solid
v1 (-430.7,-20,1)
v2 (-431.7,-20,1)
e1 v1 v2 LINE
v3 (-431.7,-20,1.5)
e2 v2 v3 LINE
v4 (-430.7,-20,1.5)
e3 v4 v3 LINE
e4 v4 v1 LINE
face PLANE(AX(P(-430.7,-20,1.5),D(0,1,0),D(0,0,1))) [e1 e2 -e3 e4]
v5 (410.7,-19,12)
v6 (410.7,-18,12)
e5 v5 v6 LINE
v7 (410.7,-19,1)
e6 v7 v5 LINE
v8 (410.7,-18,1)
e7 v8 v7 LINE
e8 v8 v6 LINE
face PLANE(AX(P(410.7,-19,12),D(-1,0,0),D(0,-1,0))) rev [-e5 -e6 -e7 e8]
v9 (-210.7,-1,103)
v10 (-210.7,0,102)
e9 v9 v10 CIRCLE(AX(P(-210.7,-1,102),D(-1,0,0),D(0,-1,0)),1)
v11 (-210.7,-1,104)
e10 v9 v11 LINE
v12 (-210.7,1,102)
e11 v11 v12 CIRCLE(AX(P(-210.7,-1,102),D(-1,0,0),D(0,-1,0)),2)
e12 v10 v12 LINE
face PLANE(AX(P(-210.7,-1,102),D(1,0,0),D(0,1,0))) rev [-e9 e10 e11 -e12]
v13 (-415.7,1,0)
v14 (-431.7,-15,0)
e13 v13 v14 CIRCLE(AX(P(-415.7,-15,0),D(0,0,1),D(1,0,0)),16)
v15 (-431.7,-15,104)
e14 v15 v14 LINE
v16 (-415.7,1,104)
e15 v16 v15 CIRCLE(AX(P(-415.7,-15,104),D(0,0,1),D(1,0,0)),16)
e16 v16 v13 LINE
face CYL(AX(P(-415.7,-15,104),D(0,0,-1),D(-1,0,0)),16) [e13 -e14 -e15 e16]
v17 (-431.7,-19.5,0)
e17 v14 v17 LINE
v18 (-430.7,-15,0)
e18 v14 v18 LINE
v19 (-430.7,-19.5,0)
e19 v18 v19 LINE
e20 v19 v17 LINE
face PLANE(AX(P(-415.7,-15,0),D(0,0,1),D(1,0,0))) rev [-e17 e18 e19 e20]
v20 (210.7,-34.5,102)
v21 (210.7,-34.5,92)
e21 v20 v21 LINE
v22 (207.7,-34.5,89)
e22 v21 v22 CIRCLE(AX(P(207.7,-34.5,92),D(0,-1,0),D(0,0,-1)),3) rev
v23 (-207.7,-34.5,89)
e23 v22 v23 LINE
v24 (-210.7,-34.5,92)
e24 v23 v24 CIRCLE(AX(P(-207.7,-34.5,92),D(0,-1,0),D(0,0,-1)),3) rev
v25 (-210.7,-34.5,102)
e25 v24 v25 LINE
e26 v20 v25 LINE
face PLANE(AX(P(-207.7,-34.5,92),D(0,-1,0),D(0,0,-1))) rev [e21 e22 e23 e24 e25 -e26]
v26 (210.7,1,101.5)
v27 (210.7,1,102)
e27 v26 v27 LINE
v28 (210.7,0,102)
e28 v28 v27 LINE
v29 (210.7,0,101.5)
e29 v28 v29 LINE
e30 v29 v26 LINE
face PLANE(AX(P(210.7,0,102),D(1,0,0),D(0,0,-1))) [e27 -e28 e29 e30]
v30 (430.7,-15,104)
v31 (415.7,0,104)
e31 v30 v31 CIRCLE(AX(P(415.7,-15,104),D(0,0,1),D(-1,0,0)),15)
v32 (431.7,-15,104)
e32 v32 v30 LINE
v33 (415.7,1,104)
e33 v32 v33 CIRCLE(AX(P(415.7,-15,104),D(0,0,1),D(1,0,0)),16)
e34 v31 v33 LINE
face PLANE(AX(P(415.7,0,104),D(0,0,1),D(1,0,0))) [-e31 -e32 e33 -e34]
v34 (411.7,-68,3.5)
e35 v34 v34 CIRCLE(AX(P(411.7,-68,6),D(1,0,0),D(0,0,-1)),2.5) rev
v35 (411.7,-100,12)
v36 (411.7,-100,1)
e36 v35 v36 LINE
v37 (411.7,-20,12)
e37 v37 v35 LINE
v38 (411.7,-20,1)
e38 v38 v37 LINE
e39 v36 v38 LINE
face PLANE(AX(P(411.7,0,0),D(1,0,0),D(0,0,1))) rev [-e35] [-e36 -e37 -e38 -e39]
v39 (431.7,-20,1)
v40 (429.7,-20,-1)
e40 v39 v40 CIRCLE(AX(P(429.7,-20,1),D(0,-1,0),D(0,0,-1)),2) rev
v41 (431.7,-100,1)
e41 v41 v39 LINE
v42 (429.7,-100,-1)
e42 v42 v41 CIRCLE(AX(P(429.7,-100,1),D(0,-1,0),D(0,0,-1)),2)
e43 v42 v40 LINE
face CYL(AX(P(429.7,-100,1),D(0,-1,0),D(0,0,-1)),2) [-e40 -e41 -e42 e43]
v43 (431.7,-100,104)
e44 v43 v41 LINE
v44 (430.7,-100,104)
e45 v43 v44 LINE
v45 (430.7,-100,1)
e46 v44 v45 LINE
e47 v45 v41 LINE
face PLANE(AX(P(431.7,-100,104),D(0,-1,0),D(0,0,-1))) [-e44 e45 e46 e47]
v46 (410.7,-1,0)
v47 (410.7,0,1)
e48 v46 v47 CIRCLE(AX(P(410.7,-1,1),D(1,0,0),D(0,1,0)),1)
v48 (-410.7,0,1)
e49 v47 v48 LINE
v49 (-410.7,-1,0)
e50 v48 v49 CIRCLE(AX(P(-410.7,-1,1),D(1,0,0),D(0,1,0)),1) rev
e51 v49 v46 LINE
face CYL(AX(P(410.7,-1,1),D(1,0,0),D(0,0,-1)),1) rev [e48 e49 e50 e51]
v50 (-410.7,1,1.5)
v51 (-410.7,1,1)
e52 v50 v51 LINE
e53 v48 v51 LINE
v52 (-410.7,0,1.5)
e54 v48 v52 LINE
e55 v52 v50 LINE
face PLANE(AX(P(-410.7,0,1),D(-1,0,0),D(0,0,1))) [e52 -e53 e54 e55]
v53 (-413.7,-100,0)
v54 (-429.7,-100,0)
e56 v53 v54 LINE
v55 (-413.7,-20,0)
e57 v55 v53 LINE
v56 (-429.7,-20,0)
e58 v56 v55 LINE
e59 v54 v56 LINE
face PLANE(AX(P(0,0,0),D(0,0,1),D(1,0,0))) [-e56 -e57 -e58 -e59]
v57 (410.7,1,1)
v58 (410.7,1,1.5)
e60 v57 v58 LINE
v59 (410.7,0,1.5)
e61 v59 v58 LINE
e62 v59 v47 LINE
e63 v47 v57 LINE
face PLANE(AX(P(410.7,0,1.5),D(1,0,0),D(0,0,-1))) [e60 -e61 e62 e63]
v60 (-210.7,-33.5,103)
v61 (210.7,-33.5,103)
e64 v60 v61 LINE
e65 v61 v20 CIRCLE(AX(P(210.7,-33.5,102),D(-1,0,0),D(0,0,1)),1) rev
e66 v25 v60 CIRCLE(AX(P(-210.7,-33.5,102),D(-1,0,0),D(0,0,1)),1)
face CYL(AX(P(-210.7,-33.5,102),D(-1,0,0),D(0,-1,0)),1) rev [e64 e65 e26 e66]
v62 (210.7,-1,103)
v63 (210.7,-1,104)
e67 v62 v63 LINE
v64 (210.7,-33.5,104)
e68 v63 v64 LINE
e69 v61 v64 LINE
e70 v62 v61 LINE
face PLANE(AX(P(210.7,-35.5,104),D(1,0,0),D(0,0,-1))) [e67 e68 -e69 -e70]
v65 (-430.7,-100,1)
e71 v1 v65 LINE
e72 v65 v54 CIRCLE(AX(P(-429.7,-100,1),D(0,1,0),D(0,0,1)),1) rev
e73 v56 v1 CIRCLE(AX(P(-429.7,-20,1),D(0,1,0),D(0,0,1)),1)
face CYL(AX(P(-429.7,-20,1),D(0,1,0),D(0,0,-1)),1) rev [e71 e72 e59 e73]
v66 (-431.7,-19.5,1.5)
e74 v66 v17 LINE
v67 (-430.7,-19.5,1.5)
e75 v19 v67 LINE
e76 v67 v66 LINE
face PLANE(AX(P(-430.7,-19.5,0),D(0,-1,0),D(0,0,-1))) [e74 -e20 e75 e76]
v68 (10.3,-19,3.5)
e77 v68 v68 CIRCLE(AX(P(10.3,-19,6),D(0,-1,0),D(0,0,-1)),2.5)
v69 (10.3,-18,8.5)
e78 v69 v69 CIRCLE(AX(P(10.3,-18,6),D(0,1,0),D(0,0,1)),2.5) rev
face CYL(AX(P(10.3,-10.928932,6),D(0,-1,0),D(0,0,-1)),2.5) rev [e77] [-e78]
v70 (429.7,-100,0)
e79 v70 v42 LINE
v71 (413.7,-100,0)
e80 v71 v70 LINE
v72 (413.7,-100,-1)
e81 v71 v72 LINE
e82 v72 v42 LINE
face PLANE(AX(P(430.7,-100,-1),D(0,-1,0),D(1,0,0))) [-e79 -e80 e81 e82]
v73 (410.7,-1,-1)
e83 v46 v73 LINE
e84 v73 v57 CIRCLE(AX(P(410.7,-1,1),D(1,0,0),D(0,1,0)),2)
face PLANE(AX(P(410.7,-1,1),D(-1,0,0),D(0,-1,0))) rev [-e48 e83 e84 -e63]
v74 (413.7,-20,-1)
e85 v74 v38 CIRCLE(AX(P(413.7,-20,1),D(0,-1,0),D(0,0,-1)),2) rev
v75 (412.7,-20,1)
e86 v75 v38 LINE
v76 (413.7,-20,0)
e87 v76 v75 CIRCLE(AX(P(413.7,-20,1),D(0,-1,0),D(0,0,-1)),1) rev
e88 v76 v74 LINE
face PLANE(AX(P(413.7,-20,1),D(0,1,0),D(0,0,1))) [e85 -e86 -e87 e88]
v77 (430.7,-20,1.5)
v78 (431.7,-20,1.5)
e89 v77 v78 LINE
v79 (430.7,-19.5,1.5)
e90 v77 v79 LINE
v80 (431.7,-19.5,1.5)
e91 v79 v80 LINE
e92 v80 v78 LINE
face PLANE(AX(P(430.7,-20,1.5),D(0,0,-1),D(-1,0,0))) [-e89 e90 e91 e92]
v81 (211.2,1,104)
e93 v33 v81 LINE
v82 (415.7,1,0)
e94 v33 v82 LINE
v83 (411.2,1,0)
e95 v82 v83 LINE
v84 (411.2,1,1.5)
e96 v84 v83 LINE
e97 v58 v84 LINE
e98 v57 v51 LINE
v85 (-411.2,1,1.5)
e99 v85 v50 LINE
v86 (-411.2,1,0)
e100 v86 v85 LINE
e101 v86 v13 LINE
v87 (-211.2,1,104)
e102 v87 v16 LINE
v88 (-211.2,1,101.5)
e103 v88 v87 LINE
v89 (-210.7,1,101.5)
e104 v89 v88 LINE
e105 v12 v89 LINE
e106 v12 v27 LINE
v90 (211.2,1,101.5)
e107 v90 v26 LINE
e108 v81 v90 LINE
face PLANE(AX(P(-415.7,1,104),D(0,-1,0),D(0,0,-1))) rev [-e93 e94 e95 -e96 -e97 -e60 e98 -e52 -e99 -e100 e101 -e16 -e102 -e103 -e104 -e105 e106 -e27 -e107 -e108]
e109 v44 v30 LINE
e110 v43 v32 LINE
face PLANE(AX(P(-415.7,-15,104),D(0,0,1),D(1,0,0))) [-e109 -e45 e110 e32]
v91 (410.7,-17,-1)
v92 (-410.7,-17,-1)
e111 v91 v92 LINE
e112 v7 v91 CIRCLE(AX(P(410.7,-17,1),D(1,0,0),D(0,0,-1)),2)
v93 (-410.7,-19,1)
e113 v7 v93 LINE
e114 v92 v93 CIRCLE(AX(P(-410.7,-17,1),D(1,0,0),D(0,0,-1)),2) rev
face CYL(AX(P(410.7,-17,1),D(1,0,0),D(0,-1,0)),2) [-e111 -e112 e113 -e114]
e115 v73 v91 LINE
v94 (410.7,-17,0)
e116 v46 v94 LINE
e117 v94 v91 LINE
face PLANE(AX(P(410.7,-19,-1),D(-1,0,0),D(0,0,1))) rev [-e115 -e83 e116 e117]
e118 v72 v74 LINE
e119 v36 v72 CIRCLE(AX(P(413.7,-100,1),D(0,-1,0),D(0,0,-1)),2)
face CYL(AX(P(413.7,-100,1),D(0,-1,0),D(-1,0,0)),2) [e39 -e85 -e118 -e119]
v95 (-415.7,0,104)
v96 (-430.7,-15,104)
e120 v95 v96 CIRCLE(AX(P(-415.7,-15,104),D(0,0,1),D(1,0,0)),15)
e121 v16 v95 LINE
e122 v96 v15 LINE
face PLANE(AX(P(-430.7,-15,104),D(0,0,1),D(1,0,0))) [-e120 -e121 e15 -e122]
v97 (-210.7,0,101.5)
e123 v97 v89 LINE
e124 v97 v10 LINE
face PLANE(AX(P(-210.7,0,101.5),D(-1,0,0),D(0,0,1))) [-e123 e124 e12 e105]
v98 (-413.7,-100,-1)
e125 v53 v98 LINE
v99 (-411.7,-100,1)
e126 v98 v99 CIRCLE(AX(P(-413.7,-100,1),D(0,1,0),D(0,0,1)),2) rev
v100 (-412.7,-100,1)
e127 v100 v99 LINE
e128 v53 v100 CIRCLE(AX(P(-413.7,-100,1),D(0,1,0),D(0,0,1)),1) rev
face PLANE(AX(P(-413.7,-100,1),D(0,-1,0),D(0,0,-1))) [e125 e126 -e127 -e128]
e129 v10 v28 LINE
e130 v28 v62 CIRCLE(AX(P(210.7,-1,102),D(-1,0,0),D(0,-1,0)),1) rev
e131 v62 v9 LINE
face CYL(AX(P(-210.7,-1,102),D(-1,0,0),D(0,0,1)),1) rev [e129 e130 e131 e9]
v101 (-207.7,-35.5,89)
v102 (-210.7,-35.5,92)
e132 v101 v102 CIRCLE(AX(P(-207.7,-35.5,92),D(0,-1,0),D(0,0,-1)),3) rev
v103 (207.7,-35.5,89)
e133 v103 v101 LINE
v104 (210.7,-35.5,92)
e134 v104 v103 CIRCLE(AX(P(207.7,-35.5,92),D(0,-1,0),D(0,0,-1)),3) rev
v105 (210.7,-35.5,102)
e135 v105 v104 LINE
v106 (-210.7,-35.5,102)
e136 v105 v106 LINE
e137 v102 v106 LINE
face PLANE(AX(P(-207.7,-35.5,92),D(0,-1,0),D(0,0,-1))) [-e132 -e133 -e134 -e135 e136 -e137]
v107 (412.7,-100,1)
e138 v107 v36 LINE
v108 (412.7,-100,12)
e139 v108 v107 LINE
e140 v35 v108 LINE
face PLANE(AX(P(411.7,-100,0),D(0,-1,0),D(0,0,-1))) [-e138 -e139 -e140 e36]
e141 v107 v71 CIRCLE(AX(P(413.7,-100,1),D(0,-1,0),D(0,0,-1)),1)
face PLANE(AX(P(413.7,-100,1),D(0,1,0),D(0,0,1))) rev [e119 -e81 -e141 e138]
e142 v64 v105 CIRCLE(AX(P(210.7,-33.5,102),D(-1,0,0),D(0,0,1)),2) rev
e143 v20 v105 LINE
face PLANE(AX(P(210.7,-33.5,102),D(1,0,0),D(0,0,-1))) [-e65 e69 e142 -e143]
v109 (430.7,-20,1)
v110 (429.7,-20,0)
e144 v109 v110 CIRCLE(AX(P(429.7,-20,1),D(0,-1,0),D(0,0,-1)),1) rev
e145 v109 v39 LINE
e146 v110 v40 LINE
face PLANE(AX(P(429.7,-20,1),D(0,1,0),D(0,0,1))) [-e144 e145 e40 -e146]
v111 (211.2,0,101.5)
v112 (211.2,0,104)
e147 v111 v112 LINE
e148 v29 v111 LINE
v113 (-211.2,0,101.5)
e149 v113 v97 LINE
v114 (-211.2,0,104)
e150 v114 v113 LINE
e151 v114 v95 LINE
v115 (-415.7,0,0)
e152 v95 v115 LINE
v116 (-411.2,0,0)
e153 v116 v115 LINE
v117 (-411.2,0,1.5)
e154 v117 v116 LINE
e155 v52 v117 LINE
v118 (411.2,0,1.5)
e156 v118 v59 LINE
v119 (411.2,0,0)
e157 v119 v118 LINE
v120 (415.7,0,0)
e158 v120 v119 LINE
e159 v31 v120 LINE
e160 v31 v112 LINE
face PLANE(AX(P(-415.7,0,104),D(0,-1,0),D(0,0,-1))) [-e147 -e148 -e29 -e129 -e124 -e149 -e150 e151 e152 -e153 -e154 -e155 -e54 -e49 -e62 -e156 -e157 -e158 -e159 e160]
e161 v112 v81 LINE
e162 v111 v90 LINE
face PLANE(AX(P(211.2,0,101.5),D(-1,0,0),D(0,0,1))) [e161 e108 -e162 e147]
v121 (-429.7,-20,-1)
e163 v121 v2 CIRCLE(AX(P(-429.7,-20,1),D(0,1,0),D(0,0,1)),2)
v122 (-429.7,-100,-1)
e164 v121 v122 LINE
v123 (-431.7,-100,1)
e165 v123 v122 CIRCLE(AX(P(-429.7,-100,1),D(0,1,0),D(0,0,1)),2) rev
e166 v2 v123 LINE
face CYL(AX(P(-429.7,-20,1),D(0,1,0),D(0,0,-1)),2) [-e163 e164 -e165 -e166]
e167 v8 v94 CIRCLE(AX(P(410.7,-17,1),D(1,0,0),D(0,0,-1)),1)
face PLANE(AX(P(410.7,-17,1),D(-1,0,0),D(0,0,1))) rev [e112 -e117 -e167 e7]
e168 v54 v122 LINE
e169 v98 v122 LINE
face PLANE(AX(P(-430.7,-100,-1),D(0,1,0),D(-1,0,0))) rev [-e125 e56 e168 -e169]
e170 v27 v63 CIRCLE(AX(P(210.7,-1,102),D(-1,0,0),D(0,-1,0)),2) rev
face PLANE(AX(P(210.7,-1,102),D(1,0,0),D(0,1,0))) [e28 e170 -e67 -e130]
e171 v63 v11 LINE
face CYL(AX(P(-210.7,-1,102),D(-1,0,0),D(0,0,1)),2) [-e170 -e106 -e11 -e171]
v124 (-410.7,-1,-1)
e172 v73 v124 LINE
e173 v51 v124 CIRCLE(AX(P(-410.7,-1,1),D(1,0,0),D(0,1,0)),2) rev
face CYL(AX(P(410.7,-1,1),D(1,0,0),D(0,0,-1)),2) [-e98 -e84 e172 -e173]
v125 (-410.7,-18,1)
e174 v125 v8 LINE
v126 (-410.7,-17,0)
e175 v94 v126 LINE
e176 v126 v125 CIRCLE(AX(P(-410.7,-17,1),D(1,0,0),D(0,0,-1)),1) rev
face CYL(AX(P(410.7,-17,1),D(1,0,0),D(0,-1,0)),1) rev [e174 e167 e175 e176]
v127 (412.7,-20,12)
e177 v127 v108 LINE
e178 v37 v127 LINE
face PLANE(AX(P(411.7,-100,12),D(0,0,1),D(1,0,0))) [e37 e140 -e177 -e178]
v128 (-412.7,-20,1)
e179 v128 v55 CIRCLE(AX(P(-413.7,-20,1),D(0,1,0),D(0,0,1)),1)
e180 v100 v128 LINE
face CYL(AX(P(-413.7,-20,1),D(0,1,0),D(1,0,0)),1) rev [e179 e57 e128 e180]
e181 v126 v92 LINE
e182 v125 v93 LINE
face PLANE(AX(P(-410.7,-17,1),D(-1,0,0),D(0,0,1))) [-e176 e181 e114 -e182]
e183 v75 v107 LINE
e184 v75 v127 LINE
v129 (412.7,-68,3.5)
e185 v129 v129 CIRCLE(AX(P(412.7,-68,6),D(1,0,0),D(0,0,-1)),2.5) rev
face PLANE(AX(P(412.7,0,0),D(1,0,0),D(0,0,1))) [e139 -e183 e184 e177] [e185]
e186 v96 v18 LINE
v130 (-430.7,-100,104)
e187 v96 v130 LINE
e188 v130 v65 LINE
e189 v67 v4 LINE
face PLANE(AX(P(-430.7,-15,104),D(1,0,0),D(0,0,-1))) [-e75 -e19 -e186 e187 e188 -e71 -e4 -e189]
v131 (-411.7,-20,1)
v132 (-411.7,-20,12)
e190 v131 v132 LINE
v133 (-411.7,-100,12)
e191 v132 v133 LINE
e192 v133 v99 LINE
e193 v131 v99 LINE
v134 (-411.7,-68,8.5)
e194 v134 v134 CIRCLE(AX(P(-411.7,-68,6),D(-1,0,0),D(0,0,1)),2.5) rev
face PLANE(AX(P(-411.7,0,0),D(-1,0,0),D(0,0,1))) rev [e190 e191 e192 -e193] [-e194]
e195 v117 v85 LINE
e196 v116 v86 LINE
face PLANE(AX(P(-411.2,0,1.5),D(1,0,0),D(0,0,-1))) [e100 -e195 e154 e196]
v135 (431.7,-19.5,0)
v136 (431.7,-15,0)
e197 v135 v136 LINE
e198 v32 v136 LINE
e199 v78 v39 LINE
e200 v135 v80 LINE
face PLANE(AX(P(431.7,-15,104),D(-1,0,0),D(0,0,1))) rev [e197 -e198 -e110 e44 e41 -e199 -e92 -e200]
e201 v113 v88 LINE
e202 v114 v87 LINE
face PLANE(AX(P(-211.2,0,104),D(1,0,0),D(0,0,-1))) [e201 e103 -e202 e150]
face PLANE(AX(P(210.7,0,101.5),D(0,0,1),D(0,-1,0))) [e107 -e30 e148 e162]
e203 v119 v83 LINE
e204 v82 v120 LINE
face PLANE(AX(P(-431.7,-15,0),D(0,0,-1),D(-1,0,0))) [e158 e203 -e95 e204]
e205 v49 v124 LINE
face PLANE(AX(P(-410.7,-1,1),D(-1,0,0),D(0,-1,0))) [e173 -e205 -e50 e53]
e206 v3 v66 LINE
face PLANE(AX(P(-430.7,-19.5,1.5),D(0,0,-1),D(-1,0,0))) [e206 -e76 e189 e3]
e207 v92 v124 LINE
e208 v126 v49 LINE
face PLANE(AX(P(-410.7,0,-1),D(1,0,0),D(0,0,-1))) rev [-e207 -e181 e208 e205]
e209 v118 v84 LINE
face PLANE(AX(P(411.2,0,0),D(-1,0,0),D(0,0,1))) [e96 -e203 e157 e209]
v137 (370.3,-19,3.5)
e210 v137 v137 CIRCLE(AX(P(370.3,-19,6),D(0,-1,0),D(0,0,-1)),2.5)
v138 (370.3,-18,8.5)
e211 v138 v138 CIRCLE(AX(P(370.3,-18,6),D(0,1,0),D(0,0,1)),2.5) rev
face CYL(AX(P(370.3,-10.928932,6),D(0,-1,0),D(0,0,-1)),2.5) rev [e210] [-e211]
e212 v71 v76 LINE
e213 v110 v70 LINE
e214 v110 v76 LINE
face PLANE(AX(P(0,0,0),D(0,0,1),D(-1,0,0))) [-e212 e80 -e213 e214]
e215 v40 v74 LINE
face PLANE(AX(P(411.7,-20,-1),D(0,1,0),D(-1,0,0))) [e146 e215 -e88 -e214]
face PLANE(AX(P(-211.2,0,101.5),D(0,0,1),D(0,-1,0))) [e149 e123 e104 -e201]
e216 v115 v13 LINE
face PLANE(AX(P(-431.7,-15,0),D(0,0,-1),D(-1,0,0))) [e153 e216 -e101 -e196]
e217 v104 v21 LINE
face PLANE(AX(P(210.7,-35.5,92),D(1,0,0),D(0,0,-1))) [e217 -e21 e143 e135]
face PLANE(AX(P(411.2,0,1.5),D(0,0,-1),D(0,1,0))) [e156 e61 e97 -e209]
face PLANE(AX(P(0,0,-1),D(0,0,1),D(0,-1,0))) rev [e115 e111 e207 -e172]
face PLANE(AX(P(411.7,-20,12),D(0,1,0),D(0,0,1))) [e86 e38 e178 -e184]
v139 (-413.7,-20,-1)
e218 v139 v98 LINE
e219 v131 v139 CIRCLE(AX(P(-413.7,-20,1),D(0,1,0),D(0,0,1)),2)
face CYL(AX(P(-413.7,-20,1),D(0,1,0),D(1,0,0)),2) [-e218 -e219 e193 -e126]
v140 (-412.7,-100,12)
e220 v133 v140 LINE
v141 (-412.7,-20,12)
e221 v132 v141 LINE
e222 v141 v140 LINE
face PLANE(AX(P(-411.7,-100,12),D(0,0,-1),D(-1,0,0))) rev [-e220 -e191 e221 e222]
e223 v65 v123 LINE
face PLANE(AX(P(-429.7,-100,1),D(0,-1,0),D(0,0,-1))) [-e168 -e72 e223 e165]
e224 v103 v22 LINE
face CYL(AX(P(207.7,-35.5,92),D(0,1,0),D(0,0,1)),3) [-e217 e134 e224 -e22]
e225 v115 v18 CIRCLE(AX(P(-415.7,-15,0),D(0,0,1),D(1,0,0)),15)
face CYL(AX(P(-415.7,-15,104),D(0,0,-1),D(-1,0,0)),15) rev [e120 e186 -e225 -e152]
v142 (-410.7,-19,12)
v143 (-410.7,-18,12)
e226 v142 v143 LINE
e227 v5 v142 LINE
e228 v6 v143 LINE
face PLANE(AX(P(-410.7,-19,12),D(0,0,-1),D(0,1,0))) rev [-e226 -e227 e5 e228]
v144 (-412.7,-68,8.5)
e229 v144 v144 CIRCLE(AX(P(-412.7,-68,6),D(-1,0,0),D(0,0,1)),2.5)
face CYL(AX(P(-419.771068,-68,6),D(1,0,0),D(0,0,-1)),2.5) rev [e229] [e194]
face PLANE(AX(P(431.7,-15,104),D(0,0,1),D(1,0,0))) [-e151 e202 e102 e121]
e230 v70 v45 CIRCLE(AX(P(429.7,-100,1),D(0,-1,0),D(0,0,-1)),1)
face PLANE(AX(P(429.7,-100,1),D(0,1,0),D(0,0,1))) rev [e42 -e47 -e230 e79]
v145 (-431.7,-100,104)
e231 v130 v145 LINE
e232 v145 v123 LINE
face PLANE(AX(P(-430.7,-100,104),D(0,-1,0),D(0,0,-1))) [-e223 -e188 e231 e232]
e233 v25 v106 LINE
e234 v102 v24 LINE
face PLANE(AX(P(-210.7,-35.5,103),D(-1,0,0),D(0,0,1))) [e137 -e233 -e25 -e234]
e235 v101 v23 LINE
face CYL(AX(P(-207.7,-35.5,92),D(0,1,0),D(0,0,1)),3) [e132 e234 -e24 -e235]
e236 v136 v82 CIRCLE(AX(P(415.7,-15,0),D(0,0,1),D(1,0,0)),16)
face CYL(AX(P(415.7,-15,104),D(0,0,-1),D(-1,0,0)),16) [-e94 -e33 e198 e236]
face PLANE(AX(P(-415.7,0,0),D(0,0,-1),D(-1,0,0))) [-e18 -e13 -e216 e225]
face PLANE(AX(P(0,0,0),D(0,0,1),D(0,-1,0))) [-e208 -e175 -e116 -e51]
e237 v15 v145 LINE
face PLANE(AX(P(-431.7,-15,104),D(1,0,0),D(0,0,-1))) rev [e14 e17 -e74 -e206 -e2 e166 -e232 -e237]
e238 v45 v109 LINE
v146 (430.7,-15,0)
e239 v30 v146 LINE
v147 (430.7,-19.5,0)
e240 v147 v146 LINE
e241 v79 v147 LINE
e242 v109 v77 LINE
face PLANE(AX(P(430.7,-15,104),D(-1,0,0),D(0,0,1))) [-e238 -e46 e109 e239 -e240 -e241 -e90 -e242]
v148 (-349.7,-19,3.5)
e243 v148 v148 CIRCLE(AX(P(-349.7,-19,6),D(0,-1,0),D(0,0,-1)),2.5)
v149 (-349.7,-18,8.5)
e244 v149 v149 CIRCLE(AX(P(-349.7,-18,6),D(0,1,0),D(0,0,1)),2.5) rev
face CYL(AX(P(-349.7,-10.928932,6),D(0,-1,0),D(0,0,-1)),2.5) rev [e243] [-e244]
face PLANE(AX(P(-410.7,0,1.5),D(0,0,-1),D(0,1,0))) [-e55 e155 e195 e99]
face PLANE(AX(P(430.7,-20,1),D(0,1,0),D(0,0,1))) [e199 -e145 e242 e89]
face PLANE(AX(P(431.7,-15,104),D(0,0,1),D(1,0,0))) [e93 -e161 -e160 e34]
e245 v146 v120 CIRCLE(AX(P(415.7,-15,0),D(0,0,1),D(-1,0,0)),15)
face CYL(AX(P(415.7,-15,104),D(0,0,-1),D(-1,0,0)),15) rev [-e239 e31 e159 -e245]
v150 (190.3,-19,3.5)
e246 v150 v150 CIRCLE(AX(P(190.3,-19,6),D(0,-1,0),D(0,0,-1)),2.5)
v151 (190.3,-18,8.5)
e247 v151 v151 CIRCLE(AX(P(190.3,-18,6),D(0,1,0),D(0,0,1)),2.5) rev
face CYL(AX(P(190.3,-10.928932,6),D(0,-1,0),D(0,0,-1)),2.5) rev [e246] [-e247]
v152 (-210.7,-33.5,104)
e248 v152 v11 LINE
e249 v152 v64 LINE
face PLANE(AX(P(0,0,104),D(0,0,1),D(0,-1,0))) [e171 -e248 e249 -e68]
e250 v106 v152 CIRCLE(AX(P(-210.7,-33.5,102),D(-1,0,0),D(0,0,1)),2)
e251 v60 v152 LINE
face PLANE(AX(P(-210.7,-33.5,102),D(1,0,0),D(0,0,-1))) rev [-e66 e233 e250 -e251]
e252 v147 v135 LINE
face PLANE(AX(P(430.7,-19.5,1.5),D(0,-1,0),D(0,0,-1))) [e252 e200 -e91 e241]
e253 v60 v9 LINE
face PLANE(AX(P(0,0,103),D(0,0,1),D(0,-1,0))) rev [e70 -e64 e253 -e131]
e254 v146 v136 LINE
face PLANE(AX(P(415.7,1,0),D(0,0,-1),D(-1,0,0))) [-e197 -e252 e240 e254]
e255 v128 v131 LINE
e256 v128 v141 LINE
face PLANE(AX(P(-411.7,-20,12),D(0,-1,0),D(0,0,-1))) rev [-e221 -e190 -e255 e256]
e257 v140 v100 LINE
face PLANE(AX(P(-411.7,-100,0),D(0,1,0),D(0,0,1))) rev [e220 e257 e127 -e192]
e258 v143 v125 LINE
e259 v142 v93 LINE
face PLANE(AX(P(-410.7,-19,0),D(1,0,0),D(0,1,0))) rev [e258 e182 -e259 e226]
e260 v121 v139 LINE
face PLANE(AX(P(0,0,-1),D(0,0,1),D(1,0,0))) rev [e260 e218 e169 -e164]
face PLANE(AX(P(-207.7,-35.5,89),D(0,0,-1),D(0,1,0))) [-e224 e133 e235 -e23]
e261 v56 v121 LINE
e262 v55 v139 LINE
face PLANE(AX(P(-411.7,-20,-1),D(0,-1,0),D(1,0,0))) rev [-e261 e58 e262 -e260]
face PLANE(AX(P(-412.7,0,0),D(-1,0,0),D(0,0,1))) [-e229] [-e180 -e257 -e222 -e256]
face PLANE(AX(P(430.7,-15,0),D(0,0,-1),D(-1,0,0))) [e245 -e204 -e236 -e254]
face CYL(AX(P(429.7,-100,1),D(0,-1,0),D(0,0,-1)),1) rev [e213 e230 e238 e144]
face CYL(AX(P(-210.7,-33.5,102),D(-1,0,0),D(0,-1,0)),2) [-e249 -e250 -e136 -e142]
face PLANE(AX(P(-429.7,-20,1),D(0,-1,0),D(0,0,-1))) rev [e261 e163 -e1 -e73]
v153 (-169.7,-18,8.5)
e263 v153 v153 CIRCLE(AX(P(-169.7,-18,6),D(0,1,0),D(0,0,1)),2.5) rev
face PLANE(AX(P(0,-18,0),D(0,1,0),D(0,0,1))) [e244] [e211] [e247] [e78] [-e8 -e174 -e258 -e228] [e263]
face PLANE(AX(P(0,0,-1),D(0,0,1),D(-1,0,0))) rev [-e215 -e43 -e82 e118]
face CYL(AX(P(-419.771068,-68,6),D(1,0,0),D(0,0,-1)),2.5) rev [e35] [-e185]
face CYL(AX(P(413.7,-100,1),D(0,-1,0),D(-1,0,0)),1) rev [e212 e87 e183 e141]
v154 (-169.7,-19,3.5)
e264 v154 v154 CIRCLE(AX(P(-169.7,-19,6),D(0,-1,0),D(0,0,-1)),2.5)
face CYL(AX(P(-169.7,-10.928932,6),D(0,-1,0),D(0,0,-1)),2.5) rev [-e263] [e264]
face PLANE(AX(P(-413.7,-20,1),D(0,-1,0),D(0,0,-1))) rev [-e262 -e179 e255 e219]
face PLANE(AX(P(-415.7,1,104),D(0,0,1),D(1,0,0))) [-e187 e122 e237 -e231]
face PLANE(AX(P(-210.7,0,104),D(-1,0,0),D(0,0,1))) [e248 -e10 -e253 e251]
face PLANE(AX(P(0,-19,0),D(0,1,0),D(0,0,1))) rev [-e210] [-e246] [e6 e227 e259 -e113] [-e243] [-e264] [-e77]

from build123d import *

# Parameters (mm, degrees)
BASE_FLANGE1_DEPTH             = 104
EDGE_FLANGE1_STRIP_W           = 6
EDGE_FLANGE1_STRIP_H           = 1
EDGE_FLANGE1_STRIP_CUT_DEPTH   = 821.4
EDGE_FLANGE1_RELIEF_W          = 6.5
EDGE_FLANGE1_RELIEF_H          = 0.5
EDGE_FLANGE1_RELIEF_CUT_DEPTH  = 1
EDGE_FLANGE1_DEPTH             = 821.4
EDGE_FLANGE2_STRIP_W           = 6
EDGE_FLANGE2_STRIP_H           = 1
EDGE_FLANGE2_STRIP_CUT_DEPTH   = 821.4
EDGE_FLANGE2_DEPTH             = 821.4
EDGE_FLANGE3_STRIP_W           = 6
EDGE_FLANGE3_STRIP_H           = 1
EDGE_FLANGE3_STRIP_CUT_DEPTH   = 80
EDGE_FLANGE3_RELIEF_W          = 6.5
EDGE_FLANGE3_RELIEF_H          = 0.5
EDGE_FLANGE3_RELIEF_CUT_DEPTH  = 1
EDGE_FLANGE3_DEPTH             = 80
EDGE_FLANGE4_STRIP_W           = 6
EDGE_FLANGE4_STRIP_H           = 1
EDGE_FLANGE4_STRIP_CUT_DEPTH   = 80
EDGE_FLANGE4_DEPTH             = 80
EDGE_FLANGE5_STRIP_W           = 6
EDGE_FLANGE5_STRIP_H           = 1
EDGE_FLANGE5_STRIP_CUT_DEPTH   = 421.4
EDGE_FLANGE5_RELIEF_W          = 6.5
EDGE_FLANGE5_RELIEF_H          = 0.5
EDGE_FLANGE5_RELIEF_CUT_DEPTH  = 1
EDGE_FLANGE5_DEPTH             = 421.4
SKETCH22_R                     = 2.5
CUT_EXTRUDE1_DEPTH             = 1
SKETCH23_R                     = 2.5
CUT_EXTRUDE2_DEPTH             = 3
CUT_EXTRUDE2_DIRECTION_2_REACH = 857.652
EDGE_FLANGE6_STRIP_W           = 6
EDGE_FLANGE6_STRIP_H           = 1
EDGE_FLANGE6_STRIP_CUT_DEPTH   = 421.4
EDGE_FLANGE6_DEPTH             = 421.4
EDGE_FLANGE6_FLAT_DEPTH        = 1


# Sheet-metal steps are written as plain solids
with BuildPart() as part:
    # Sketch1 → Base-Flange1 (new body)
    with BuildSketch(Plane.XY):
        with BuildLine():
            Line((-430.7, -100), (-430.7, -15))
            ThreePointArc((-430.7, -15), (-426.306601718, -4.393398282), (-415.7, 0))
            Line((-415.7, 0), (415.7, 0))
            ThreePointArc((415.7, 0), (426.306601718, -4.393398282), (430.7, -15))
            Line((430.7, -15), (430.7, -100))
            Line((430.7, -100), (431.7, -100))
            Line((431.7, -100), (431.7, -15))
            ThreePointArc((431.7, -15), (427.013708499, -3.686291501), (415.7, 1))
            Line((415.7, 1), (-415.7, 1))
            ThreePointArc((-415.7, 1), (-427.013708499, -3.686291501), (-431.7, -15))
            Line((-431.7, -15), (-431.7, -100))
            Line((-431.7, -100), (-430.7, -100))
        make_face()
    extrude(amount=BASE_FLANGE1_DEPTH)

    # Edge-Flange1 strip (across the edge) → Edge-Flange1 strip cut (cut)
    with BuildSketch(Plane(origin=(-410.7, 0, 0), x_dir=(0, 0, 1), z_dir=(1, 0, 0))):
        with Locations((-2, -0.5)):
            Rectangle(EDGE_FLANGE1_STRIP_W, EDGE_FLANGE1_STRIP_H)
    extrude(amount=EDGE_FLANGE1_STRIP_CUT_DEPTH, mode=Mode.SUBTRACT)

    # Edge-Flange1 relief (on the sheet) → Edge-Flange1 relief cut (cut)
    with BuildSketch(Plane(origin=(-410.7, 0, 1), x_dir=(0, 0, 1), z_dir=(0, -1, 0))):
        with Locations((-2.75, 0.25)):
            Rectangle(EDGE_FLANGE1_RELIEF_W, EDGE_FLANGE1_RELIEF_H)
        with Locations((-2.75, -821.65)):
            Rectangle(EDGE_FLANGE1_RELIEF_W, EDGE_FLANGE1_RELIEF_H)
    extrude(amount=-EDGE_FLANGE1_RELIEF_CUT_DEPTH, mode=Mode.SUBTRACT)

    # Edge-Flange1 section (across the edge) → Edge-Flange1 (add)
    with BuildSketch(Plane(origin=(-410.7, 0, 0), x_dir=(0, 0, 1), z_dir=(1, 0, 0))):
        with BuildLine():
            Line((-1, 1), (-1, 19))
            Line((-1, 19), (0, 19))
            Line((0, 19), (0, 1))
            ThreePointArc((0, 1), (0.292893219, 0.292893219), (1, 0))
            Line((1, 0), (1, -1))
            ThreePointArc((1, -1), (-0.414213562, -0.414213562), (-1, 1))
        make_face()
    extrude(amount=EDGE_FLANGE1_DEPTH)

    # Edge-Flange2 strip (across the edge) → Edge-Flange2 strip cut (cut)
    with BuildSketch(Plane(origin=(-410.7, -19, 0), x_dir=(0, 1, 0), z_dir=(1, 0, 0))):
        with Locations((-1, -0.5)):
            Rectangle(EDGE_FLANGE2_STRIP_W, EDGE_FLANGE2_STRIP_H)
    extrude(amount=EDGE_FLANGE2_STRIP_CUT_DEPTH, mode=Mode.SUBTRACT)

    # Edge-Flange2 section (across the edge) → Edge-Flange2 (add)
    with BuildSketch(Plane(origin=(-410.7, -19, 0), x_dir=(0, 1, 0), z_dir=(1, 0, 0))):
        with BuildLine():
            Line((0, 1), (0, 12))
            Line((0, 12), (1, 12))
            Line((1, 12), (1, 1))
            ThreePointArc((1, 1), (1.292893219, 0.292893219), (2, 0))
            Line((2, 0), (2, -1))
            ThreePointArc((2, -1), (0.585786438, -0.414213562), (0, 1))
        make_face()
    extrude(amount=EDGE_FLANGE2_DEPTH)

    # Edge-Flange3 strip (across the edge) → Edge-Flange3 strip cut (cut)
    with BuildSketch(Plane(origin=(-430.7, -100, 0), x_dir=(0, 0, 1), z_dir=(0, 1, 0))):
        with Locations((-2, -0.5)):
            Rectangle(EDGE_FLANGE3_STRIP_W, EDGE_FLANGE3_STRIP_H)
    edge_flange3_strip_cut = extrude(amount=EDGE_FLANGE3_STRIP_CUT_DEPTH, mode=Mode.SUBTRACT)

    # Edge-Flange3 relief (on the sheet) → Edge-Flange3 relief cut (cut)
    with BuildSketch(Plane(origin=(-430.7, -100, 1), x_dir=(0, 0, 1), z_dir=(1, 0, 0))):
        with Locations((-2.75, -80.25)):
            Rectangle(EDGE_FLANGE3_RELIEF_W, EDGE_FLANGE3_RELIEF_H)
    edge_flange3_relief_cut = extrude(amount=-EDGE_FLANGE3_RELIEF_CUT_DEPTH, mode=Mode.SUBTRACT)

    # Edge-Flange3 section (across the edge) → Edge-Flange3 (add)
    with BuildSketch(Plane(origin=(-430.7, -100, 0), x_dir=(0, 0, 1), z_dir=(0, 1, 0))):
        with BuildLine():
            Line((-1, 1), (-1, 19))
            Line((-1, 19), (0, 19))
            Line((0, 19), (0, 1))
            ThreePointArc((0, 1), (0.292893219, 0.292893219), (1, 0))
            Line((1, 0), (1, -1))
            ThreePointArc((1, -1), (-0.414213562, -0.414213562), (-1, 1))
        make_face()
    edge_flange3 = extrude(amount=EDGE_FLANGE3_DEPTH)

    # Edge-Flange4 strip (across the edge) → Edge-Flange4 strip cut (cut)
    with BuildSketch(Plane(origin=(-411.7, -100, 0), x_dir=(-1, 0, 0), z_dir=(0, 1, 0))):
        with Locations((-1, -0.5)):
            Rectangle(EDGE_FLANGE4_STRIP_W, EDGE_FLANGE4_STRIP_H)
    edge_flange4_strip_cut = extrude(amount=EDGE_FLANGE4_STRIP_CUT_DEPTH, mode=Mode.SUBTRACT)

    # Edge-Flange4 section (across the edge) → Edge-Flange4 (add)
    with BuildSketch(Plane(origin=(-411.7, -100, 0), x_dir=(-1, 0, 0), z_dir=(0, 1, 0))):
        with BuildLine():
            Line((0, 1), (0, 12))
            Line((0, 12), (1, 12))
            Line((1, 12), (1, 1))
            ThreePointArc((1, 1), (1.292893219, 0.292893219), (2, 0))
            Line((2, 0), (2, -1))
            ThreePointArc((2, -1), (0.585786438, -0.414213562), (0, 1))
        make_face()
    edge_flange4 = extrude(amount=EDGE_FLANGE4_DEPTH)

    # Mirror1: Edge-Flange3 strip cut, Edge-Flange3 relief cut, Edge-Flange3, Edge-Flange4 strip cut, Edge-Flange4 across plane
    add(edge_flange3_strip_cut.mirror(Plane(origin=(0, 0, 0), x_dir=(0, 0, 1), z_dir=(1, 0, 0))), mode=Mode.SUBTRACT)
    add(edge_flange3_relief_cut.mirror(Plane(origin=(0, 0, 0), x_dir=(0, 0, 1), z_dir=(1, 0, 0))), mode=Mode.SUBTRACT)
    add(edge_flange3.mirror(Plane(origin=(0, 0, 0), x_dir=(0, 0, 1), z_dir=(1, 0, 0))))
    add(edge_flange4_strip_cut.mirror(Plane(origin=(0, 0, 0), x_dir=(0, 0, 1), z_dir=(1, 0, 0))), mode=Mode.SUBTRACT)
    add(edge_flange4.mirror(Plane(origin=(0, 0, 0), x_dir=(0, 0, 1), z_dir=(1, 0, 0))))

    # Edge-Flange5 strip (across the edge) → Edge-Flange5 strip cut (cut)
    with BuildSketch(Plane(origin=(210.7, 0, 104), x_dir=(0, 0, -1), z_dir=(-1, 0, 0))):
        with Locations((-1, -0.5)):
            Rectangle(EDGE_FLANGE5_STRIP_W, EDGE_FLANGE5_STRIP_H)
    extrude(amount=EDGE_FLANGE5_STRIP_CUT_DEPTH, mode=Mode.SUBTRACT)

    # Edge-Flange5 relief (on the sheet) → Edge-Flange5 relief cut (cut)
    with BuildSketch(Plane(origin=(210.7, 0, 102), x_dir=(0, 0, -1), z_dir=(0, -1, 0))):
        with Locations((-2.75, 0.25)):
            Rectangle(EDGE_FLANGE5_RELIEF_W, EDGE_FLANGE5_RELIEF_H)
        with Locations((-2.75, -421.65)):
            Rectangle(EDGE_FLANGE5_RELIEF_W, EDGE_FLANGE5_RELIEF_H)
    extrude(amount=-EDGE_FLANGE5_RELIEF_CUT_DEPTH, mode=Mode.SUBTRACT)

    # Edge-Flange5 section (across the edge) → Edge-Flange5 (add)
    with BuildSketch(Plane(origin=(210.7, 0, 104), x_dir=(0, 0, -1), z_dir=(-1, 0, 0))):
        with BuildLine():
            Line((0, 1), (0, 35.5))
            Line((0, 35.5), (1, 35.5))
            Line((1, 35.5), (1, 1))
            ThreePointArc((1, 1), (1.292893219, 0.292893219), (2, 0))
            Line((2, 0), (2, -1))
            ThreePointArc((2, -1), (0.585786438, -0.414213562), (0, 1))
        make_face()
    extrude(amount=EDGE_FLANGE5_DEPTH)

    # Sketch22 → Cut-Extrude1 (cut)
    with BuildSketch(Plane.XZ.offset(19)):
        with Locations(Location((-349.7, 6, 0), (0, 0, 270))):
            Circle(SKETCH22_R)
        with Locations(Location((-169.7, 6, 0), (0, 0, 270))):
            Circle(SKETCH22_R)
        with Locations(Location((10.3, 6, 0), (0, 0, 270))):
            Circle(SKETCH22_R)
        with Locations(Location((190.3, 6, 0), (0, 0, 270))):
            Circle(SKETCH22_R)
        with Locations(Location((370.3, 6, 0), (0, 0, 270))):
            Circle(SKETCH22_R)
        with Locations((550.3, 6)):
            Circle(SKETCH22_R)
        with Locations((730.3, 6)):
            Circle(SKETCH22_R)
    extrude(amount=-CUT_EXTRUDE1_DEPTH, mode=Mode.SUBTRACT)

    # Sketch23 → Cut-Extrude2 (cut)
    with BuildSketch(Plane.ZY.offset(-411.7)):
        with Locations(Location((6, -68, 0), (0, 0, 180))):
            Circle(SKETCH23_R)
    extrude(amount=-CUT_EXTRUDE2_DEPTH, mode=Mode.SUBTRACT)

    # Cut-Extrude2 direction 2: up to this face of the body (flat: up to its plane)
    cut_extrude2_direction_2_end = Plane(part.part.faces().sort_by_distance((-412.7, -60, 6.5))[0])
    # Sketch23 → Cut-Extrude2 direction 2 (cut, up to the picked face)
    with BuildSketch(Plane.ZY.offset(-411.7), mode=Mode.PRIVATE) as cut_extrude2_direction_2_sk1:
        with Locations(Location((6, -68, 0), (0, 0, 180))):
            Circle(SKETCH23_R)
    cut_extrude2_direction_2_tool1 = split(extrude(cut_extrude2_direction_2_sk1.sketch, amount=CUT_EXTRUDE2_DIRECTION_2_REACH, mode=Mode.PRIVATE), bisect_by=cut_extrude2_direction_2_end, keep=Keep.BOTH, mode=Mode.PRIVATE)
    add(cut_extrude2_direction_2_tool1.solids().sort_by(Axis((411.7, -68, 6), (-1, 0, 0)))[0], mode=Mode.SUBTRACT)

    # Edge-Flange6 strip (across the edge) → Edge-Flange6 strip cut (cut)
    with BuildSketch(Plane(origin=(210.7, -35.5, 103), x_dir=(0, 1, 0), z_dir=(-1, 0, 0))):
        with Locations((-1, -0.5)):
            Rectangle(EDGE_FLANGE6_STRIP_W, EDGE_FLANGE6_STRIP_H)
    extrude(amount=EDGE_FLANGE6_STRIP_CUT_DEPTH, mode=Mode.SUBTRACT)

    # Edge-Flange6 bend section (across the edge) → Edge-Flange6 (add)
    with BuildSketch(Plane(origin=(210.7, -35.5, 103), x_dir=(0, 1, 0), z_dir=(-1, 0, 0))):
        with BuildLine():
            Line((0, 1), (1, 1))
            ThreePointArc((1, 1), (1.292893219, 0.292893219), (2, 0))
            Line((2, 0), (2, -1))
            ThreePointArc((2, -1), (0.585786438, -0.414213562), (0, 1))
        make_face()
    extrude(amount=EDGE_FLANGE6_DEPTH)

    # Edge-Flange6 profile (on flange) → Edge-Flange6 flat (add)
    with BuildSketch(Plane(origin=(0, -35.5, 103), x_dir=(1, 0, 0), z_dir=(0, 1, 0))):
        with BuildLine():
            Line((-210.7, 1), (210.7, 1))
            Line((210.7, 1), (210.7, 11))
            ThreePointArc((210.7, 11), (209.821320344, 13.121320344), (207.7, 14))
            Line((207.7, 14), (-207.7, 14))
            ThreePointArc((-207.7, 14), (-209.821320344, 13.121320344), (-210.7, 11))
            Line((-210.7, 11), (-210.7, 1))
        make_face()
    extrude(amount=EDGE_FLANGE6_FLAT_DEPTH)


solid = part.part
